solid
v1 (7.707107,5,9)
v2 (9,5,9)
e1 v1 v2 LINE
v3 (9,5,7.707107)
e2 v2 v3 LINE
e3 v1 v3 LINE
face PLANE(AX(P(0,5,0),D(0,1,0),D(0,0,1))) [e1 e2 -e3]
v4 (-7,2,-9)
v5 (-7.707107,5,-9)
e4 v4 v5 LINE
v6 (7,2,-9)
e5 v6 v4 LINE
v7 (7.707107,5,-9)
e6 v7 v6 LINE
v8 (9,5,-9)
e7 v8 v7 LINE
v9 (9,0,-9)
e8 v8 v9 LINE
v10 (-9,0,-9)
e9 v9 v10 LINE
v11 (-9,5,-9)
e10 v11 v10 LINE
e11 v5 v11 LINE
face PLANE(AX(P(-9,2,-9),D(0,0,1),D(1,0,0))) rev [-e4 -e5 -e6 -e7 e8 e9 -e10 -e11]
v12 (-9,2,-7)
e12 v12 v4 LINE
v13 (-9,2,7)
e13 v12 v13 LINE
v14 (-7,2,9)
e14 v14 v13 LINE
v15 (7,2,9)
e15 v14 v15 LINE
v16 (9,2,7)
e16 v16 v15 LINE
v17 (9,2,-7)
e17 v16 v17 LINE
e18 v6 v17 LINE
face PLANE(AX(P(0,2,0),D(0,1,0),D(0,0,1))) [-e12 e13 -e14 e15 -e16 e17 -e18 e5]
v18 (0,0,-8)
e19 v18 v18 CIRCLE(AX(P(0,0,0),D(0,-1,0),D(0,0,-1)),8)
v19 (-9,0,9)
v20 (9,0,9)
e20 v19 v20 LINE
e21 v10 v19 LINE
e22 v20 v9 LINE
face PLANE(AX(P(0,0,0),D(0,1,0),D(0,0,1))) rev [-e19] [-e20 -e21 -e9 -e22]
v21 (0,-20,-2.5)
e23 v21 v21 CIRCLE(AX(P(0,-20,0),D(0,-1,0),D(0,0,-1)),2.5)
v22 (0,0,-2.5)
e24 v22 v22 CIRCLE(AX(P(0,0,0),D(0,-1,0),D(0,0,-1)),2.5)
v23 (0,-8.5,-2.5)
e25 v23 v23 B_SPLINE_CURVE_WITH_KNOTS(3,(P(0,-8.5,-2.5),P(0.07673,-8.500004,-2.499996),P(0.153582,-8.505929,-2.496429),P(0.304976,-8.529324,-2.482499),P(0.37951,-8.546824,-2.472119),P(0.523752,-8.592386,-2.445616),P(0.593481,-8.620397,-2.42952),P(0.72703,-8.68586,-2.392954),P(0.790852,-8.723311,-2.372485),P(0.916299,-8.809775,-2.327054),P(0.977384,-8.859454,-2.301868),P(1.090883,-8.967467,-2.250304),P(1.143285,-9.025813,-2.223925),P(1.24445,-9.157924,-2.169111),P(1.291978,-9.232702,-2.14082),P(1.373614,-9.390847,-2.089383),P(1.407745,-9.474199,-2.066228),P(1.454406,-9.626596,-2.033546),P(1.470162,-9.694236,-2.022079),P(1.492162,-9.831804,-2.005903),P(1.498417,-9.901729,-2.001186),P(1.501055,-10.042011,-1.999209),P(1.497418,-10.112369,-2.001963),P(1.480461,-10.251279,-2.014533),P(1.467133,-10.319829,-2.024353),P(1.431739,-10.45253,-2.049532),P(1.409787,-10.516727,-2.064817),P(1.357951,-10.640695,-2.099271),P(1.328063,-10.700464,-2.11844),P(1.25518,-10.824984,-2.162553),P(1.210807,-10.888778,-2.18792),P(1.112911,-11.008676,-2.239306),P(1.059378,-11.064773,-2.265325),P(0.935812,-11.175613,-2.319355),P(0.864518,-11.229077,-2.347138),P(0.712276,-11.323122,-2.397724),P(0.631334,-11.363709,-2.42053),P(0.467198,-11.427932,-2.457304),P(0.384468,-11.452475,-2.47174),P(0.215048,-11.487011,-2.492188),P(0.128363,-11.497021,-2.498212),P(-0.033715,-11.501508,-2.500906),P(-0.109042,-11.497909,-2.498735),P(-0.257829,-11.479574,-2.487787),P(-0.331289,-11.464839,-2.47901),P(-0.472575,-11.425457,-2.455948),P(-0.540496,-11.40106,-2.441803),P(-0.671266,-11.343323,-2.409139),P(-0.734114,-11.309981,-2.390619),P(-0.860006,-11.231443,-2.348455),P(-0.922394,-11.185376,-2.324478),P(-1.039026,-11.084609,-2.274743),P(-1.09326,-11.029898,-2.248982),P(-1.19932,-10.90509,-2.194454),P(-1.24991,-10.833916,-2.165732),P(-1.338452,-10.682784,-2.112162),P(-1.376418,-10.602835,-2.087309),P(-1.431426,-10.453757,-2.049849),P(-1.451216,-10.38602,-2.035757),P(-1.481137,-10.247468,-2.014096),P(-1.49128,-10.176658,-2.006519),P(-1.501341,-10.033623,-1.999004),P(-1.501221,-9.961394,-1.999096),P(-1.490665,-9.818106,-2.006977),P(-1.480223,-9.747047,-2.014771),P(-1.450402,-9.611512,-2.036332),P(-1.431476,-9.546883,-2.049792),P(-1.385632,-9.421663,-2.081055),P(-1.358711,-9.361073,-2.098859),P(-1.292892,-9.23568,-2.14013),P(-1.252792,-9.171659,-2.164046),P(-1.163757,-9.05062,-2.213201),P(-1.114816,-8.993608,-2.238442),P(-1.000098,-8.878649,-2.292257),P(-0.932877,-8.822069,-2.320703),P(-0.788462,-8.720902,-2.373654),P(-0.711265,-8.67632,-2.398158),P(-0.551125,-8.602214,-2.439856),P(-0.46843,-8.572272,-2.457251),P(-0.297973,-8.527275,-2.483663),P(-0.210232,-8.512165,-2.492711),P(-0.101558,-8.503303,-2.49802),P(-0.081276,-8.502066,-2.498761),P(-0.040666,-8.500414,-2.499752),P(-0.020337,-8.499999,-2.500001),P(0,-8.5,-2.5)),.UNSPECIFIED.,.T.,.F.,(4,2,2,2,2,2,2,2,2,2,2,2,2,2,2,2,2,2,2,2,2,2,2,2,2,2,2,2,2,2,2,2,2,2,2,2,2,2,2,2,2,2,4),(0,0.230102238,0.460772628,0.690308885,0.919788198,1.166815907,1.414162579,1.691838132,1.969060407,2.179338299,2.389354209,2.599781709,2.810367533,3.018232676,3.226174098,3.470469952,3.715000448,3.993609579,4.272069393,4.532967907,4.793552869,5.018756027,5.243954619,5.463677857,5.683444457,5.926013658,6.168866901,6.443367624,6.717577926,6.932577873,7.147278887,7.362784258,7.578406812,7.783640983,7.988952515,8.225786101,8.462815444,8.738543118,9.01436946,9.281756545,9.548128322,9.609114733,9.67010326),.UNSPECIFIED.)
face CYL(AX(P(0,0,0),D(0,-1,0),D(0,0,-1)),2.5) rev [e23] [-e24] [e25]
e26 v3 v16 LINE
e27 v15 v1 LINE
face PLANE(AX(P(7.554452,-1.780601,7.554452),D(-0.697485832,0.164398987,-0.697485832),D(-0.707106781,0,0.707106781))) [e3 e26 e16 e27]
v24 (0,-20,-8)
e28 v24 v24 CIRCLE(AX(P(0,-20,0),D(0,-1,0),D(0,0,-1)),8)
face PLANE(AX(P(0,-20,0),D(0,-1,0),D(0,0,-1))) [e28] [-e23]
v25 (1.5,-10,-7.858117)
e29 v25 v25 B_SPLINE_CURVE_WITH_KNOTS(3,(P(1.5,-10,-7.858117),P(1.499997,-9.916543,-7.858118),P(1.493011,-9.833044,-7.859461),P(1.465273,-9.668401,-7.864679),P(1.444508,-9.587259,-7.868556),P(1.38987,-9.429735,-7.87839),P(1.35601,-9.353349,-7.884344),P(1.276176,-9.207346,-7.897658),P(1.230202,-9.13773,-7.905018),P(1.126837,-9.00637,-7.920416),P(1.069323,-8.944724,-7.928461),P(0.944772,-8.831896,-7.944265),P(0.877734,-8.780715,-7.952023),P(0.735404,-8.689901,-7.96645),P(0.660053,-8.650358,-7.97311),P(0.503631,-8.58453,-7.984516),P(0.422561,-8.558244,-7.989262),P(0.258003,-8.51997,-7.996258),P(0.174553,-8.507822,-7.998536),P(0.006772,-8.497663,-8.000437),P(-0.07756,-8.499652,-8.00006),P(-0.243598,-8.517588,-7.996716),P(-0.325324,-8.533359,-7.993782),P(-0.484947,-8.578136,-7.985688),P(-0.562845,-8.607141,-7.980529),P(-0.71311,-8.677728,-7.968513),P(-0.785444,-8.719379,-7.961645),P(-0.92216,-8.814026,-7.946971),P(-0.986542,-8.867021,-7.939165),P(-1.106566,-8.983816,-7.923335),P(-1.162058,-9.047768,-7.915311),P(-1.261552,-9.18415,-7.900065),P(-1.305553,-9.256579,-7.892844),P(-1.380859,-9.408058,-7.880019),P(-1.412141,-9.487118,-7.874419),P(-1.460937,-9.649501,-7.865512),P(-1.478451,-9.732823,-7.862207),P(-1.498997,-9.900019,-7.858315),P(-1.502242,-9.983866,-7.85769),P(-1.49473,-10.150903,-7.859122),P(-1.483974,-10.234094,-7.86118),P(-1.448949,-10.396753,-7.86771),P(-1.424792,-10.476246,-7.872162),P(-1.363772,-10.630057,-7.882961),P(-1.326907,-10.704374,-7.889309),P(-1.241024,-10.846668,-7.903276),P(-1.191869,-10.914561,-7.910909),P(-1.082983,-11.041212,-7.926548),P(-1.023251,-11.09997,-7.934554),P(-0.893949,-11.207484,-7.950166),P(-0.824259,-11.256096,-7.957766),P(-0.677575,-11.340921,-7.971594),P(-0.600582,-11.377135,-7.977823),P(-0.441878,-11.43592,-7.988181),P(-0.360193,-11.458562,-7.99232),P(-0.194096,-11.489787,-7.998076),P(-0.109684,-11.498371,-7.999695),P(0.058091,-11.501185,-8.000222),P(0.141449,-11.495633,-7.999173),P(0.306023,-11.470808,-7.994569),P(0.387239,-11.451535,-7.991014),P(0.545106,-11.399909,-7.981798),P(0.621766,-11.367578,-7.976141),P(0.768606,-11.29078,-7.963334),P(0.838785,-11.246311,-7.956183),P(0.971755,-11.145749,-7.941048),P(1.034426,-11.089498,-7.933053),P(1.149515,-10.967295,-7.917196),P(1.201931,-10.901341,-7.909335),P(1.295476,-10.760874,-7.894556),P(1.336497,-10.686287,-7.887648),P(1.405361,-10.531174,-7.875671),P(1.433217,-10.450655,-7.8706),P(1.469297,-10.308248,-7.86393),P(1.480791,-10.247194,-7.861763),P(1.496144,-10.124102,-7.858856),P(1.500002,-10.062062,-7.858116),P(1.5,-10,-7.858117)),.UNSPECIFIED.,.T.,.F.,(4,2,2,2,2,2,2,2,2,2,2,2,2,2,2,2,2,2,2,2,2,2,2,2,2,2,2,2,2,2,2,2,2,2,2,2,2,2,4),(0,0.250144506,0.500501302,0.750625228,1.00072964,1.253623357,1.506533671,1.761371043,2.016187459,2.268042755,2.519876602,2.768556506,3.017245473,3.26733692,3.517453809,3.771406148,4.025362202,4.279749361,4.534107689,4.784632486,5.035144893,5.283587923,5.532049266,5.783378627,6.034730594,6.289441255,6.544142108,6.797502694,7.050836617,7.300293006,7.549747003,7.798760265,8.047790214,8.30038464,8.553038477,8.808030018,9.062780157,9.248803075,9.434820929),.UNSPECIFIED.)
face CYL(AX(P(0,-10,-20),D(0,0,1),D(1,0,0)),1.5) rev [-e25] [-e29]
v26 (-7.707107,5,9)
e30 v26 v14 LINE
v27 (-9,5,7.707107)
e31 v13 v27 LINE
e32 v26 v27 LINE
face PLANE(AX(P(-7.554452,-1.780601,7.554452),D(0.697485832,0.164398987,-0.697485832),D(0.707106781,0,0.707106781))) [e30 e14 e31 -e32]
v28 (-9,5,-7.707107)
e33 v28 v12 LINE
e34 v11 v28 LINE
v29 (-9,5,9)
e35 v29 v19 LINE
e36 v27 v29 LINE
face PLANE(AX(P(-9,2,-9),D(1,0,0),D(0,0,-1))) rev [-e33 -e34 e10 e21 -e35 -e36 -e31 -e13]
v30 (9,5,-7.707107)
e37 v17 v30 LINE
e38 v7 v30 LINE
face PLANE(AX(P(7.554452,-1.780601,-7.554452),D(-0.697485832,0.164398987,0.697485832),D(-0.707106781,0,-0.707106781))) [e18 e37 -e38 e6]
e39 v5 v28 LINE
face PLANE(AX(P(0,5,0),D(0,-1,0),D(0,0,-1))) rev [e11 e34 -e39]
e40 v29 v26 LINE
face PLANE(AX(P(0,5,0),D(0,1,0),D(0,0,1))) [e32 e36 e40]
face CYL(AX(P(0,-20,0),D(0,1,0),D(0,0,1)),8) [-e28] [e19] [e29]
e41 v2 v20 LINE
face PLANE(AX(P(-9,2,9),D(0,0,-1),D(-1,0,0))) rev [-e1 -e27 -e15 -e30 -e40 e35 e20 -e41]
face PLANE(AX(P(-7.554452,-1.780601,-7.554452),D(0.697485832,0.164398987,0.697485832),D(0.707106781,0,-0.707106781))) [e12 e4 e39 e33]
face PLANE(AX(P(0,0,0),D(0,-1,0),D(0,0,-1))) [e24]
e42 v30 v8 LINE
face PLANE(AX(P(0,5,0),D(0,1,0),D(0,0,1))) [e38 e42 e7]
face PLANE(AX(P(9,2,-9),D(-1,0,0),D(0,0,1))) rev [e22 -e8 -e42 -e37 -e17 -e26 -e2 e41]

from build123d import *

# Parameters (mm, degrees)
SKETCH1_W           = 18
SKETCH1_H           = 18
BOSS_EXTRUDE1_DEPTH = 2
BOSS_EXTRUDE2_DEPTH = 3
CUT_EXTRUDE4_DEPTH  = 3
SKETCH5_R           = 8
BOSS_EXTRUDE3_DEPTH = 20
SKETCH6_R           = 2.5
CUT_EXTRUDE5_DEPTH  = 20
SKETCH7_R           = 1.5
CUT_EXTRUDE6_DEPTH  = 20


# Read off the part's stored shape, not the designer's step: Mirror1, Mirror2
with BuildPart() as part:
    # Sketch1 → Boss-Extrude1 (new body)
    with BuildSketch(Plane(origin=(0, 0, 0), x_dir=(1, 0, 0), z_dir=(0, 1, 0))):
        Rectangle(SKETCH1_W, SKETCH1_H)
    extrude(amount=BOSS_EXTRUDE1_DEPTH)

    # Sketch2 → Boss-Extrude2 (add)
    with BuildSketch(Plane(origin=(0, 2, 0), x_dir=(1, 0, 0), z_dir=(0, 1, 0))):
        Polygon((-9, 9), (-7, 9), (-9, 7), align=None)
        Polygon((9, 7), (9, 9), (7, 9), align=None)
        Polygon((7, -9), (9, -7), (9, -9), align=None)
        Polygon((-9, -7), (-9, -9), (-7, -9), align=None)
    extrude(amount=BOSS_EXTRUDE2_DEPTH)

    # Sketch4 → Cut-Extrude4 (cut)
    with BuildSketch(Plane(origin=(-7.554451855, -1.780601378, -7.554451855), x_dir=(0.7165985720844784, -0.16001422411879979, -0.678882857764243), z_dir=(0.697485832462916, 0.16439898730535757, 0.6974858324629155))):
        Polygon((-2.017235593, 6.634774192), (-2.017235593, 3.552567191), (0.773727267, 4.011398658), (-0.213027115, 6.931384239), align=None)
    extrude(amount=CUT_EXTRUDE4_DEPTH, mode=Mode.SUBTRACT)


with BuildPart() as cut_extrude4_kept_piece:
    # of the separate pieces the step leaves, the one the design keeps (cut_extrude4_pieces_kept)
    add(part.part.solids().sort_by_distance((-9, 0, -9))[0])

    # Mirror1
    split(bisect_by=Plane(origin=(0, 0, 0), x_dir=(0, 0, 1), z_dir=(1, 0, 0)), keep=Keep.BOTTOM)

    # Mirror1 2: Cut-Extrude4 kept piece across plane


with BuildPart() as cut_extrude4_kept_piece_1:
    add(cut_extrude4_kept_piece.part)
    add(cut_extrude4_kept_piece.part.mirror(Plane(origin=(0, 0, 0), x_dir=(0, 0, 1), z_dir=(1, 0, 0))))

    # Mirror2
    split(bisect_by=Plane.XY, keep=Keep.BOTTOM)

    # Mirror2 2: Cut-Extrude4 kept piece across plane


with BuildPart() as cut_extrude4_kept_piece_2:
    add(cut_extrude4_kept_piece_1.part)
    add(cut_extrude4_kept_piece_1.part.mirror(Plane.XY))

    # Sketch5 → Boss-Extrude3 (add)
    with BuildSketch(Plane.XZ):
        with Locations(Location((0, 0, 0), (0, 0, 270))):
            Circle(SKETCH5_R)
    extrude(amount=BOSS_EXTRUDE3_DEPTH)

    # Sketch6 → Cut-Extrude5 (cut)
    with BuildSketch(Plane.XZ.offset(20)):
        with Locations(Location((0, 0, 0), (0, 0, 270))):
            Circle(SKETCH6_R)
    extrude(amount=-CUT_EXTRUDE5_DEPTH, mode=Mode.SUBTRACT)

    # Sketch7 → Cut-Extrude6 (cut)
    with BuildSketch(Plane.XY):
        with Locations(Location((0, -10, 0), (0, 0, 90))):
            Circle(SKETCH7_R)
    extrude(amount=-CUT_EXTRUDE6_DEPTH, mode=Mode.SUBTRACT)


solid = cut_extrude4_kept_piece_2.part
